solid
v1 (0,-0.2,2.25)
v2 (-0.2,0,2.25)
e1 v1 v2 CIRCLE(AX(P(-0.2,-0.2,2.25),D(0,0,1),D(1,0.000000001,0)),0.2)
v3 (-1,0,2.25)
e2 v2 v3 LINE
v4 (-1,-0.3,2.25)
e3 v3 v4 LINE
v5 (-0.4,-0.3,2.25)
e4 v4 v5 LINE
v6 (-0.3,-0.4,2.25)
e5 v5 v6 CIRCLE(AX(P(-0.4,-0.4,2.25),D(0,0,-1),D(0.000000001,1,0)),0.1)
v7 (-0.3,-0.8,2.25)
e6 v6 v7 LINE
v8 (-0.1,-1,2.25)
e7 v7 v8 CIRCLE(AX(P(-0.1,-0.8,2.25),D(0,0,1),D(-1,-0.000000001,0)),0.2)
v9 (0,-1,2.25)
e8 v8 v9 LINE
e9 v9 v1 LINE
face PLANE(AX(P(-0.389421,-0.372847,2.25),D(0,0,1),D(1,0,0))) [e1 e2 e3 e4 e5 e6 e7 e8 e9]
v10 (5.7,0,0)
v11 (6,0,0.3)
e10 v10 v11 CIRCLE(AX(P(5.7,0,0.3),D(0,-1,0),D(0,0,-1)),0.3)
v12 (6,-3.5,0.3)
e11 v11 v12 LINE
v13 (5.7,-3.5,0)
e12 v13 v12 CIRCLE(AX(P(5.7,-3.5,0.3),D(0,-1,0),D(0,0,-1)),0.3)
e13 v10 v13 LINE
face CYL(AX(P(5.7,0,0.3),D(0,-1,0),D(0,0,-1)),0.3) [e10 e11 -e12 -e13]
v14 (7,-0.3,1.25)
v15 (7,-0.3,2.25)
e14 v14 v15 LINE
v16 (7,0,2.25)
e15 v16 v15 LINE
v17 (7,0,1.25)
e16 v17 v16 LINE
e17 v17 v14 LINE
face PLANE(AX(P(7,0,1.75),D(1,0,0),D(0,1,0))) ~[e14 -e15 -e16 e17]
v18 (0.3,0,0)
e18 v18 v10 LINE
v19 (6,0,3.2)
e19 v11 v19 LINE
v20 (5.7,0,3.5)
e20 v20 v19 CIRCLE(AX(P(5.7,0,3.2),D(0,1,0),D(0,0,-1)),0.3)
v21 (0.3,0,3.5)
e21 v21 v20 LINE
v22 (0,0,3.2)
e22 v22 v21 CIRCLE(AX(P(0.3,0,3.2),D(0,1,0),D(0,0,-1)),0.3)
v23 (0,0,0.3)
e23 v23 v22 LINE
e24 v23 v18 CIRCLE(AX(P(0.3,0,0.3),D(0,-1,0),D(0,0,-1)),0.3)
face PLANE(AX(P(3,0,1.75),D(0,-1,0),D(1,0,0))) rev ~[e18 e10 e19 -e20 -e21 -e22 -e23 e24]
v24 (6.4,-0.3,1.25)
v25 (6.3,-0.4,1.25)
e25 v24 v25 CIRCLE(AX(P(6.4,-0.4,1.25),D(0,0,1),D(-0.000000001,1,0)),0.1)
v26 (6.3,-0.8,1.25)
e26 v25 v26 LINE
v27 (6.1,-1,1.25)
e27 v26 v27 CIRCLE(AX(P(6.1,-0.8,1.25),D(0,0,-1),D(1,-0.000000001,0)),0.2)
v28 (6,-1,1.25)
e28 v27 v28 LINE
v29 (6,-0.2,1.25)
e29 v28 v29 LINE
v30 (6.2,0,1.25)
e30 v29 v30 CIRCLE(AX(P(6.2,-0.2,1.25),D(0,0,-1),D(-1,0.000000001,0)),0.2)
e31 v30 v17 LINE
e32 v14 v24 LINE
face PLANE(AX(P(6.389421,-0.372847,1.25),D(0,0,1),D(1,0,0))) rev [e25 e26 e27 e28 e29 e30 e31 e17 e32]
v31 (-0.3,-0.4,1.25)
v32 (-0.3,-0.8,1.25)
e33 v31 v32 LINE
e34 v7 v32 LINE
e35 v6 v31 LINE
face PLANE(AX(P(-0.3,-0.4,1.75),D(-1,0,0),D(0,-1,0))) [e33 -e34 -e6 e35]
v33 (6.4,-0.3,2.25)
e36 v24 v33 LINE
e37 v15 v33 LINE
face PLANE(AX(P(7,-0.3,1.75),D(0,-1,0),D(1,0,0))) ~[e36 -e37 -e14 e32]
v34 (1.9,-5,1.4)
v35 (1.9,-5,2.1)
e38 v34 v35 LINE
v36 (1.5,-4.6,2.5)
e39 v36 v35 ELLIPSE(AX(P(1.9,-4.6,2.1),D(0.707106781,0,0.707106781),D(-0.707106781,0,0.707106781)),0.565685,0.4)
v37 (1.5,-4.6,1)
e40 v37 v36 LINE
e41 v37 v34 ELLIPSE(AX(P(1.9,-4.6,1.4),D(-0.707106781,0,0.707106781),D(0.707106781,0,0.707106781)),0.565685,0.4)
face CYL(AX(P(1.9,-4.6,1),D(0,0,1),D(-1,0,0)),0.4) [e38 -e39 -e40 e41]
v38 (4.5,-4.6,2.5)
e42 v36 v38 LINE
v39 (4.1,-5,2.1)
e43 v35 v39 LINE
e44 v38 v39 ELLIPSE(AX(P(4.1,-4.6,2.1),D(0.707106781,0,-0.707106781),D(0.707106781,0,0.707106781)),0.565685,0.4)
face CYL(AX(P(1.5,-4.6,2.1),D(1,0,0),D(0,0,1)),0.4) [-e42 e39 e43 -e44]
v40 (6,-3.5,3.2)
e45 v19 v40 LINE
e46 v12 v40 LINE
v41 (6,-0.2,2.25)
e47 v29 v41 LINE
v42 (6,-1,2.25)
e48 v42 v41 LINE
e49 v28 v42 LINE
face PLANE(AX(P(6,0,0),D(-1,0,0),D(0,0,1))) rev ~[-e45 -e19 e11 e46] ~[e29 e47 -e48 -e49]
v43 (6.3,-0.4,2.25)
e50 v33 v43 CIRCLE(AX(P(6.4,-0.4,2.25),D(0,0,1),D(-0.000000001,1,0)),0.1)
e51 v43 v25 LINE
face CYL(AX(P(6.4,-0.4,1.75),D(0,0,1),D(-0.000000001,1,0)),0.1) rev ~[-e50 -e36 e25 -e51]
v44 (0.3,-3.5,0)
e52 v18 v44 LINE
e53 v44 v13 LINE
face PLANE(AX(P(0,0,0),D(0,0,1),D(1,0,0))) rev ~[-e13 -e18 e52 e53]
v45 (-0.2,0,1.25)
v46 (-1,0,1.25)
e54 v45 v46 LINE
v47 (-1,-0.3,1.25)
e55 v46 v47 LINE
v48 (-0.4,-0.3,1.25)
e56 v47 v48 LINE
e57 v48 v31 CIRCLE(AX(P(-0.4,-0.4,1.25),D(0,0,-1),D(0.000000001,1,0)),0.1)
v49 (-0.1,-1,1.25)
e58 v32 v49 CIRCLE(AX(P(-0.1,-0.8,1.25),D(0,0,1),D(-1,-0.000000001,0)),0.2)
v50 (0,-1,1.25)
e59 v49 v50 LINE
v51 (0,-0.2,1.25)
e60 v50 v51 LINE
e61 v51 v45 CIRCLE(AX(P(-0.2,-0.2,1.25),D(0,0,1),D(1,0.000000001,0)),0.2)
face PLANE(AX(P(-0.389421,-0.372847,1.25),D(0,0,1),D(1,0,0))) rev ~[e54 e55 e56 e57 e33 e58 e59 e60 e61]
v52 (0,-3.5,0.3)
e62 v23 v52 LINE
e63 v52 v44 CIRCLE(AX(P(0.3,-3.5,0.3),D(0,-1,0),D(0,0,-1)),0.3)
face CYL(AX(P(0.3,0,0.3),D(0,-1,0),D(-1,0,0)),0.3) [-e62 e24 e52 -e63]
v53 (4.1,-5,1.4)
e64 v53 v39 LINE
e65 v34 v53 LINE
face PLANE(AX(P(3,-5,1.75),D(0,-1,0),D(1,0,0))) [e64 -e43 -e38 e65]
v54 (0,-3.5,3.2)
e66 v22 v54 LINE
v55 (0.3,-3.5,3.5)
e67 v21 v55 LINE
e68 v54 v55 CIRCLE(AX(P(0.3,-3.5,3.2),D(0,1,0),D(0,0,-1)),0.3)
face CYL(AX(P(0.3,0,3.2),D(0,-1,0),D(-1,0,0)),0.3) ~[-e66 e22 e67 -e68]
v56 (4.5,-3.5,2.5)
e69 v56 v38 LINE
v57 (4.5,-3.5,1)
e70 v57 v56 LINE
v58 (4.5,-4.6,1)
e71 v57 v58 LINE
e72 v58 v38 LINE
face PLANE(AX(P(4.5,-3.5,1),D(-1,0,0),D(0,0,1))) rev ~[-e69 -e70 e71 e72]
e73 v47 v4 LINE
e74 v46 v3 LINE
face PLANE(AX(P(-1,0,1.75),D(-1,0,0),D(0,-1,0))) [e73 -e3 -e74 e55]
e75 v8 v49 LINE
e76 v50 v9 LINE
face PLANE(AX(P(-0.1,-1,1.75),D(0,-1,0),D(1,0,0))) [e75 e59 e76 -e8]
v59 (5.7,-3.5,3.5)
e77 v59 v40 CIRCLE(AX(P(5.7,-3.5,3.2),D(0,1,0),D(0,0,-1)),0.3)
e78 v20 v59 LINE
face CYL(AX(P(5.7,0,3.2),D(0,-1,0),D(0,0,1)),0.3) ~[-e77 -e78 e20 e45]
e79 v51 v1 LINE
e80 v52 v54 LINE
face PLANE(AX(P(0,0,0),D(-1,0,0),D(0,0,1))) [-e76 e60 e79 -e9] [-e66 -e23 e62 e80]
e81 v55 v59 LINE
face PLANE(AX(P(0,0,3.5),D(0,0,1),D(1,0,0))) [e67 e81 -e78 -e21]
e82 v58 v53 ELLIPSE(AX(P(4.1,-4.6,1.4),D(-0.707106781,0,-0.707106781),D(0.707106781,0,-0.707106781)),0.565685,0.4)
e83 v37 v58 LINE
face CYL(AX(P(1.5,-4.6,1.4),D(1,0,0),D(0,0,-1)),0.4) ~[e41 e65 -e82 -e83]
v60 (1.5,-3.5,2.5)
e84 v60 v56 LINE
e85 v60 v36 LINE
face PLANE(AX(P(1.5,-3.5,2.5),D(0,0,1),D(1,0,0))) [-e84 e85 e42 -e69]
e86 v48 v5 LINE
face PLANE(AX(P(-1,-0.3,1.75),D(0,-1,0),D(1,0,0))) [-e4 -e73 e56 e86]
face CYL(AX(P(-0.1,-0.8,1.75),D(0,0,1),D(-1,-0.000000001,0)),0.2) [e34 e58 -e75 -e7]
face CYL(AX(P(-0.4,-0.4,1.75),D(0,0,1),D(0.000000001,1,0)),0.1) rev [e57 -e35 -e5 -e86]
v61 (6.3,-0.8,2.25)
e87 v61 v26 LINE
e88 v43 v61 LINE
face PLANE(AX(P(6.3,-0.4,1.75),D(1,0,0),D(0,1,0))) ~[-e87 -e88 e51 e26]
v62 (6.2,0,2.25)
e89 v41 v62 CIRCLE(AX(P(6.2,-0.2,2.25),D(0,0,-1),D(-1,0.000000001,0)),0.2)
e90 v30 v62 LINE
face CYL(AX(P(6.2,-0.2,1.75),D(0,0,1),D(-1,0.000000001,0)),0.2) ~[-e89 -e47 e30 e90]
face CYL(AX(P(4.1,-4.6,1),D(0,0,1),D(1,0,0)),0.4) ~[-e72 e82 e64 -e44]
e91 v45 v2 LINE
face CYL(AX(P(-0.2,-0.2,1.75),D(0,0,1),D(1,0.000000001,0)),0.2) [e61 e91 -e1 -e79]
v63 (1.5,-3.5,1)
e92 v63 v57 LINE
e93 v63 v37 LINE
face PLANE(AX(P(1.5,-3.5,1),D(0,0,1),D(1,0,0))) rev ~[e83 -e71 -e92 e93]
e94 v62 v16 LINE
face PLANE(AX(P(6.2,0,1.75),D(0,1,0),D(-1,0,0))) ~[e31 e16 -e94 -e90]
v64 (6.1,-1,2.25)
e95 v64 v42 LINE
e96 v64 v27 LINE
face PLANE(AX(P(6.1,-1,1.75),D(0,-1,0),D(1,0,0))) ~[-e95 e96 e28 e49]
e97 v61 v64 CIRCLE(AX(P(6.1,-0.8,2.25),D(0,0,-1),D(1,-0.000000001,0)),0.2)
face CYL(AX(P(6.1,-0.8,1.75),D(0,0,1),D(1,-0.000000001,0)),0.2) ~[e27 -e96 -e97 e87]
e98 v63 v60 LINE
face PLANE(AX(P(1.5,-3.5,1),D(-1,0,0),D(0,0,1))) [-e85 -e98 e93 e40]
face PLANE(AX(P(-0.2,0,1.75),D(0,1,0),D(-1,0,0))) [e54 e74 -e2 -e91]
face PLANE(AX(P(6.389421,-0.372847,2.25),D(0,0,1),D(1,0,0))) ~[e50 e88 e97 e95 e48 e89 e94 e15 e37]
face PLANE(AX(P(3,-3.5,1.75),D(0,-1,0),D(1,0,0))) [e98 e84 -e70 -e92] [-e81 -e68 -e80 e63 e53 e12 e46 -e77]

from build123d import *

# Parameters (mm, degrees)
F0_W     = 6
F0_H     = 3.5
F1_DEPTH = 3.5
F2_W     = 3
F2_H     = 1.5
F3_DEPTH = 1.5
F4_R     = 0.3
F5_R     = 0.4
F8_DEPTH = 0.5


# Not quite as in the source:
# - a pattern or mirror of a feature is missing from the dataset's text; its kind, count and spacing are read off the source's solid


with BuildPart() as f1:
    # F0 (on Front) → F1 (new body)
    with BuildSketch(Plane.XZ):
        with Locations((3, 1.75)):
            Rectangle(F0_W, F0_H)
    extrude(amount=F1_DEPTH)

    # F2 (on face) → F3 (join)
    with BuildSketch(Plane.XZ.offset(3.5)):
        with Locations((3, 1.75)):
            Rectangle(F2_W, F2_H)
    extrude(amount=F3_DEPTH)

    # F4
    f4_edges = [f1.edges().sort_by_distance(p)[0] for p in [
        (0, -1.75, 0),
        (0, -1.75, 3.5),
        (6, -1.75, 0),
        (6, -1.75, 3.5),
    ]]
    fillet(f4_edges, radius=F4_R)

    # F5
    f5_edges = [f1.edges().sort_by_distance(p)[0] for p in [
        (1.5, -5, 1.75),
        (3, -5, 2.5),
        (3, -5, 1),
        (4.5, -5, 1.75),
    ]]
    fillet(f5_edges, radius=F5_R)

    # F7 (on mid) → F8 (join, symmetric)
    with BuildSketch(Plane.XY.offset(1.75)):
        with BuildLine():
            Line((-0.1, -1), (0, -1))
            Line((0, -1), (0, -0.2))
            ThreePointArc((0, -0.2), (-0.0585786438, -0.0585786438), (-0.2, 0))
            Line((-0.2, 0), (-1, 0))
            Line((-1, 0), (-1, -0.3))
            Line((-1, -0.3), (-0.4, -0.3))
            ThreePointArc((-0.4, -0.3), (-0.3292893219, -0.3292893219), (-0.3, -0.4))
            Line((-0.3, -0.4), (-0.3, -0.8))
            ThreePointArc((-0.3, -0.8), (-0.2414213562, -0.9414213562), (-0.1, -1))
        make_face()
    f8 = extrude(amount=F8_DEPTH, both=True)

    # F8_copies: F8 across plane
    add(f8.mirror(Plane(origin=(3, 0, 0), x_dir=(0, 0, 1), z_dir=(1, 0, 0))))


solid = f1.part
